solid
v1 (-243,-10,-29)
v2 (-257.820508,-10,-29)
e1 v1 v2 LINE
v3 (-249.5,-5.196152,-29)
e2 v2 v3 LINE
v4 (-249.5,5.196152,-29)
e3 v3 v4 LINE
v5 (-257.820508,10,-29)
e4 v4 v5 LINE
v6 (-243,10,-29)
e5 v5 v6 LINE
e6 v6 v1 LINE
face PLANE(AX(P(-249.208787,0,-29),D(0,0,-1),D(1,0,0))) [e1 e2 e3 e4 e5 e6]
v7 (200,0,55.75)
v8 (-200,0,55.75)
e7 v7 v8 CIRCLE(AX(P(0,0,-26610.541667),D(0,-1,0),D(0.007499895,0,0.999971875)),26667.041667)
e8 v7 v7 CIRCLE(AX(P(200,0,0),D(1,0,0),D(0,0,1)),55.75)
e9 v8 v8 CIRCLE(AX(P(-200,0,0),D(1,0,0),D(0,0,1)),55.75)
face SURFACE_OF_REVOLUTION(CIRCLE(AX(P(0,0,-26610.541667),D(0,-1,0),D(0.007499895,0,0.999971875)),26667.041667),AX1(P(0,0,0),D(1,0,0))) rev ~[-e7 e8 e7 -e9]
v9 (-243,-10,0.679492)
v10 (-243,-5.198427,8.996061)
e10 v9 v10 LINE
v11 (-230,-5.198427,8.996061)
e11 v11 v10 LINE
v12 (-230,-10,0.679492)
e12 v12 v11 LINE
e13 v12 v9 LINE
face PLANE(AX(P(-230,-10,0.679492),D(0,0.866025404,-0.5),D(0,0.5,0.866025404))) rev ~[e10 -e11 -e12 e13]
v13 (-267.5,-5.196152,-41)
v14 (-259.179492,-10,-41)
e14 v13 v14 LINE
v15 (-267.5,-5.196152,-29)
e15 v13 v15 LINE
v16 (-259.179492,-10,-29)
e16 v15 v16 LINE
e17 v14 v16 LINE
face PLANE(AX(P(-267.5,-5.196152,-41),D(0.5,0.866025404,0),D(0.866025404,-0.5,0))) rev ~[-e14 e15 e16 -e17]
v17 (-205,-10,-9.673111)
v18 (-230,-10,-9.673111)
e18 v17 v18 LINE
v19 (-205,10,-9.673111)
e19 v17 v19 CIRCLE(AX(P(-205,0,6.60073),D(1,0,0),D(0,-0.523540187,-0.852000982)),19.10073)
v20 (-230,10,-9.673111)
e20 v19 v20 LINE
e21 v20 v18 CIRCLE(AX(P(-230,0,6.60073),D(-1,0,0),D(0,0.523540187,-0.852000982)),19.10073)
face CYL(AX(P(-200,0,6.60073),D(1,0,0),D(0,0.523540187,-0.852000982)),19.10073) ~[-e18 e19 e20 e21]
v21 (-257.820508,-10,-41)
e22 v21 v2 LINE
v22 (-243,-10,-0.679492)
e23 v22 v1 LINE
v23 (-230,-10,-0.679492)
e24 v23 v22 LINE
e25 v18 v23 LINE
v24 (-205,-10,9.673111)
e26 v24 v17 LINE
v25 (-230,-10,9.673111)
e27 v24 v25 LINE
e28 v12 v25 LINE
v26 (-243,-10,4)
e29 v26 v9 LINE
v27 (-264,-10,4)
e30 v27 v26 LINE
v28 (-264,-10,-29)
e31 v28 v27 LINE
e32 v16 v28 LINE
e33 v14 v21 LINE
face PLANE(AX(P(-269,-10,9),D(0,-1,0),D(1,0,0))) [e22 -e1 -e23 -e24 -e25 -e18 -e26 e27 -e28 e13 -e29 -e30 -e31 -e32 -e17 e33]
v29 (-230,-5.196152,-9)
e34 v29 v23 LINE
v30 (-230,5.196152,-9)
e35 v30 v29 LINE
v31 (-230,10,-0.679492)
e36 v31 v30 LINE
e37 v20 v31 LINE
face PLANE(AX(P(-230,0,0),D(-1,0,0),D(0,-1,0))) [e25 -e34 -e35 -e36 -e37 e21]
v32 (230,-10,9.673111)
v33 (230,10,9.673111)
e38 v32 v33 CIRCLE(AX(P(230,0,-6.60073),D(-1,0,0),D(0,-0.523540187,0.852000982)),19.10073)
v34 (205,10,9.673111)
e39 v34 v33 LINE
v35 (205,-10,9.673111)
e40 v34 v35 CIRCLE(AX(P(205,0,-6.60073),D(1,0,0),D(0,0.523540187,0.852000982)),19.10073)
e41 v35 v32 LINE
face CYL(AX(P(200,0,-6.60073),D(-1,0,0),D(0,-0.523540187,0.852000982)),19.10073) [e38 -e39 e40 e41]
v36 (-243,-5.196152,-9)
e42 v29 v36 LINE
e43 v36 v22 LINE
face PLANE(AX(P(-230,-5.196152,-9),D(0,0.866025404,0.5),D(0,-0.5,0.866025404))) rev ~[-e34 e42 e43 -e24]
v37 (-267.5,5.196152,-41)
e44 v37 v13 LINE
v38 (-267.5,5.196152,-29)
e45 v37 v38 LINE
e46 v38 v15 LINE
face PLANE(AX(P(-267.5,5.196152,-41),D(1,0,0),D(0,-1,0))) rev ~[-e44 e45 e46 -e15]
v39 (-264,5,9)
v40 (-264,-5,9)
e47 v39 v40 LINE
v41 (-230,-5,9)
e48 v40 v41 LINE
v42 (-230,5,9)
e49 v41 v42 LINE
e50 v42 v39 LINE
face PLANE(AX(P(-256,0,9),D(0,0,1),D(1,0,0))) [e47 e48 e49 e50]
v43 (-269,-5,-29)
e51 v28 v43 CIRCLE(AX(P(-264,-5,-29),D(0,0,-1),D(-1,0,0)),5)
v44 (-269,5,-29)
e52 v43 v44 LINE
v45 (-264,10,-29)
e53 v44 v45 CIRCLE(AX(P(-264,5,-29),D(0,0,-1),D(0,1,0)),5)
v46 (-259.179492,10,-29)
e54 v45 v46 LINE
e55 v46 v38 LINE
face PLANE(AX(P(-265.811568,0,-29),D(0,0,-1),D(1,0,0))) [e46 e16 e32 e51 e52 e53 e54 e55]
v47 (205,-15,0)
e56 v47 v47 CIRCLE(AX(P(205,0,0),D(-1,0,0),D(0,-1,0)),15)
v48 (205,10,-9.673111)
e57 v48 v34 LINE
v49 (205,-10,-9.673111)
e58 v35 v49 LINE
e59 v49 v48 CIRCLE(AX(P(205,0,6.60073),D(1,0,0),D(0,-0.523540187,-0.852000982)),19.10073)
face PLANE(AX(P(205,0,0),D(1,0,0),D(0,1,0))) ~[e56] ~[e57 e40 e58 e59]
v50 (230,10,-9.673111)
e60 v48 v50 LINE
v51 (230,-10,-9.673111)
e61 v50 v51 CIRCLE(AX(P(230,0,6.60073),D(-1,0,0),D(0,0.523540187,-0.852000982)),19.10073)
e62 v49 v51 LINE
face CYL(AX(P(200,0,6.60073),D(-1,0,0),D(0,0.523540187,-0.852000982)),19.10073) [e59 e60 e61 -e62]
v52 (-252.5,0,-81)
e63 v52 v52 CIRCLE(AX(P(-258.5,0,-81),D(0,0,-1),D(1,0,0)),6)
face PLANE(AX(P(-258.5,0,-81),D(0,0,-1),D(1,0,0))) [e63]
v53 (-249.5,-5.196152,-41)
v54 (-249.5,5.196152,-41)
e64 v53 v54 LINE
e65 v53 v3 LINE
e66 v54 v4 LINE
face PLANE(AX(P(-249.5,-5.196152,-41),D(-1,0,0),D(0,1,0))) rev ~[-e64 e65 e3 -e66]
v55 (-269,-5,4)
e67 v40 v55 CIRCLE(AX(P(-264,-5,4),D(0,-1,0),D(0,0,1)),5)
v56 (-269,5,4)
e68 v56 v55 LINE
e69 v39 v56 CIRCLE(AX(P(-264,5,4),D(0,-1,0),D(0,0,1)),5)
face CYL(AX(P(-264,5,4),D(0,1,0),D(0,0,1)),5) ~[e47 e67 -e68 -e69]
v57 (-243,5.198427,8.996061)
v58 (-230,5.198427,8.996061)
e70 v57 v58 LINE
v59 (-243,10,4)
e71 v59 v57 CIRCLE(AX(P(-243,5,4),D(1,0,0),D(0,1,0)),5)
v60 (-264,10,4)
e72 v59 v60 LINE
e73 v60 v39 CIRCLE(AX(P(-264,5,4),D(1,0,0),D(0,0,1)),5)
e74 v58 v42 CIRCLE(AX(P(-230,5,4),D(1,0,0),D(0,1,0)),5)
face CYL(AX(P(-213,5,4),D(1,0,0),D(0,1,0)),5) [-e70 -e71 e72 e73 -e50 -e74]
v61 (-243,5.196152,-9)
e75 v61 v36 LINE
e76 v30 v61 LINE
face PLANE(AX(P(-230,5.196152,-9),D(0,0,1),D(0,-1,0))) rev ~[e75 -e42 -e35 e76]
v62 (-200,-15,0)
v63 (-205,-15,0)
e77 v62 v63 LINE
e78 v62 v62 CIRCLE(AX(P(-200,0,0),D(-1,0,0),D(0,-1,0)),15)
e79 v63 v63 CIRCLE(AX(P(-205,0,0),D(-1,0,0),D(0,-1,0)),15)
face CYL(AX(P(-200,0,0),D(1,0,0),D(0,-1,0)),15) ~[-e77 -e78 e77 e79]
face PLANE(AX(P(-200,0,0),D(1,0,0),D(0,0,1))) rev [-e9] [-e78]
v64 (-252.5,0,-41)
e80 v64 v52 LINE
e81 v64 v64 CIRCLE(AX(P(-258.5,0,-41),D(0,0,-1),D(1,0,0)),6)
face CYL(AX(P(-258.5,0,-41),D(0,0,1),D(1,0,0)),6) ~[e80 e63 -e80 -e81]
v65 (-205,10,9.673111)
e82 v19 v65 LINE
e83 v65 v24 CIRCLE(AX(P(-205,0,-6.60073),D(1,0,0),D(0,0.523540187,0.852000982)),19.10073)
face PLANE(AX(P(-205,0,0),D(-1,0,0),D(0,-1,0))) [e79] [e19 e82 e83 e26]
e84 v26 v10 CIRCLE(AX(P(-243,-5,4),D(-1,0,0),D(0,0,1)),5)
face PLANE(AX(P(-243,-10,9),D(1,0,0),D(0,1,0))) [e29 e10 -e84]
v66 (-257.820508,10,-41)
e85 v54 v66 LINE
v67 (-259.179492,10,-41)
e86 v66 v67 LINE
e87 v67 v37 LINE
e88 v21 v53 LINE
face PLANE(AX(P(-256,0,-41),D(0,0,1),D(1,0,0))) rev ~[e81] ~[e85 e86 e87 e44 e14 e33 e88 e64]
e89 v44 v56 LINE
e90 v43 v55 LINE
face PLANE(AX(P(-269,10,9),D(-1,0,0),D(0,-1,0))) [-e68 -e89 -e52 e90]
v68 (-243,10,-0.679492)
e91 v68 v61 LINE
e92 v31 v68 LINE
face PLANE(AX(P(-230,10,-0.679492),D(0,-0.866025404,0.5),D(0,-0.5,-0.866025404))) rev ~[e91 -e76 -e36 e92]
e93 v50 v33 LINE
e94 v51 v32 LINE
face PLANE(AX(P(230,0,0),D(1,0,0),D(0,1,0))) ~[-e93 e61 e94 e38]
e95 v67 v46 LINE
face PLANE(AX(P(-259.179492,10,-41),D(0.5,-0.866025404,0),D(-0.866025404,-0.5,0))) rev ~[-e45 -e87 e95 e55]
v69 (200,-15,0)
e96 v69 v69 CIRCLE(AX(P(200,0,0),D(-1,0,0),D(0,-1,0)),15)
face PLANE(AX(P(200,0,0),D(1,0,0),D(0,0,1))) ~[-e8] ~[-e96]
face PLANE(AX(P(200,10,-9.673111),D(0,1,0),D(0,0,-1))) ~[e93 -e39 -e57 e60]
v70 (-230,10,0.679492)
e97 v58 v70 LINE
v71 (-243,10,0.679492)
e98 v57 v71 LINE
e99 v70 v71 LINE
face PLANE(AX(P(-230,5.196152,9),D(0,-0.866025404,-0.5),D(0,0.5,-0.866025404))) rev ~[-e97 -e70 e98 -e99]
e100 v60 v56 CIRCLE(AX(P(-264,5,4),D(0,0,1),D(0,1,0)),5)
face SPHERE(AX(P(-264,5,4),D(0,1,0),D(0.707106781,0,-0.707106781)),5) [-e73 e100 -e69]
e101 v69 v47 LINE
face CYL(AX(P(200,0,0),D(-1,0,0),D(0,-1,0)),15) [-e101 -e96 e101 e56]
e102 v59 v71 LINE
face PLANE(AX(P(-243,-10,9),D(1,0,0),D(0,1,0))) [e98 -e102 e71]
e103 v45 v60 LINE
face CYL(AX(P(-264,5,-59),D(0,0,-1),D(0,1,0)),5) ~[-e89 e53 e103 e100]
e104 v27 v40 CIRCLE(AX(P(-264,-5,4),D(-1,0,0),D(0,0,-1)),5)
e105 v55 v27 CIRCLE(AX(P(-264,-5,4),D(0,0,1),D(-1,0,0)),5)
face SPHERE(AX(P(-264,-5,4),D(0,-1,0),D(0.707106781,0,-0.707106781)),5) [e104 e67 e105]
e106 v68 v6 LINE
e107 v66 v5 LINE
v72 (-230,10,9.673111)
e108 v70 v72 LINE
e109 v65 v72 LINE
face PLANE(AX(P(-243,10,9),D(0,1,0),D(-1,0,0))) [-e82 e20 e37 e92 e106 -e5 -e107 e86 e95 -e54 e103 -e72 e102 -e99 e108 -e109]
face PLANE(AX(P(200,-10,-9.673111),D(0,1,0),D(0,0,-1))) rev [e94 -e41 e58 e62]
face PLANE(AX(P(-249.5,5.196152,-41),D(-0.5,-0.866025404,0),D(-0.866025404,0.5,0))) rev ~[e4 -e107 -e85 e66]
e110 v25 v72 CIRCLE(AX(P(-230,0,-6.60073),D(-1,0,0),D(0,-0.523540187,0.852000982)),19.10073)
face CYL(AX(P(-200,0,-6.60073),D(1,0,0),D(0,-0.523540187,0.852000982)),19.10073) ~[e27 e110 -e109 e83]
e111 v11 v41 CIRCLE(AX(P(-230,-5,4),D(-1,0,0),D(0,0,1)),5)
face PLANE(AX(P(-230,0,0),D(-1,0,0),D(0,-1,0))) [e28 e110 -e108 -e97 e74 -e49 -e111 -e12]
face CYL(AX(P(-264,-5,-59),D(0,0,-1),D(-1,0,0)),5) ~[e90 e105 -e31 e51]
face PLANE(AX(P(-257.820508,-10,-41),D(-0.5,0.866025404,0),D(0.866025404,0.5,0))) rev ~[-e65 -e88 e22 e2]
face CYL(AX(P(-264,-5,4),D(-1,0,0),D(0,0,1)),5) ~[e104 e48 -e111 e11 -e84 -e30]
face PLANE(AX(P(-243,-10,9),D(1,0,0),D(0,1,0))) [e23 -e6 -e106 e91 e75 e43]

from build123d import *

# Parameters (mm, degrees)
F0_W          = 400
F0_H          = 55.75
F2_W          = 20
F2_H          = 19.3462212823
F3_DEPTH      = 30
F4_R          = 15
F5_DEPTH      = 5
F7_DEPTH      = 13
F9_DEPTH      = 50
F11_DEPTH     = 12
F12_R         = 6
F13_DEPTH     = 40
F14_T1_DEPTH  = 63
F14_T3_DEPTH  = 10
F14_S7_W      = 5.1
F14_S7_H      = 5.1
F14_T8_DEPTH  = 5.1
F14_S13_W     = 5.1
F14_S13_H     = 5.1
F14_T14_DEPTH = 5.1
F14_T20_DEPTH = 51
F14_T25_DEPTH = 51


# Not quite as in the source:
# - a fillet or chamfer that OpenCascade refuses, or shapes differently, is made with other operations: its cross-section is extruded or revolved along the edge and cut away or added
# - a pattern or mirror of a feature is missing from the dataset's text; its kind, count and spacing are read off the source's solid


with BuildPart() as f1:
    # F0 (on Front) → F1 (revolve)
    with BuildSketch(Plane.XZ):
        with Locations((0, 27.875)):
            Rectangle(F0_W, F0_H)
        with BuildLine():
            ThreePointArc((200, 55.75), (0, 56.5), (-200, 55.75))
            Line((-200, 55.75), (200, 55.75))
        make_face()
    revolve(axis=Axis((0, 0, 0), (1, 0, 0)))

    # F2 (on face) → F3 (join)
    with BuildSketch(Plane(origin=(-200, 0, 0), x_dir=(0, -1, 0), z_dir=(-1, 0, 0))):
        Rectangle(F2_W, F2_H)
        with BuildLine():
            ThreePointArc((-10, -9.6731106412), (0, -12.5), (10, -9.6731106412))
            Line((10, -9.6731106412), (-10, -9.6731106412))
        make_face()
        with BuildLine():
            Line((-10, 9.6731106412), (10, 9.6731106412))
            ThreePointArc((10, 9.6731106412), (0, 12.5), (-10, 9.6731106412))
        make_face()
    f3 = extrude(amount=F3_DEPTH)

    # F3_copies: F3 across plane
    add(f3.mirror(Plane(origin=(0, 0, 0), x_dir=(0, 0, 1), z_dir=(1, 0, 0))))

    # F4 (on face) → F5 (join)
    with BuildSketch(Plane(origin=(-200, 0, 0), x_dir=(0, -1, 0), z_dir=(-1, 0, 0))):
        Circle(F4_R)
        with BuildLine():
            Line((10, 9.6731106412), (10, -9.6731106412))
            ThreePointArc((10, -9.6731106412), (0, -12.5), (-10, -9.6731106412))
            Line((-10, -9.6731106412), (-10, 9.6731106412))
            ThreePointArc((-10, 9.6731106412), (0, 12.5), (10, 9.6731106412))
        make_face(mode=Mode.SUBTRACT)
    f5 = extrude(amount=F5_DEPTH)

    # F5_copies: F5 across plane
    add(f5.mirror(Plane(origin=(0, 0, 0), x_dir=(0, 0, 1), z_dir=(1, 0, 0))))

    # F6 (on face) → F7 (join)
    with BuildSketch(Plane(origin=(-230, 0, 0), x_dir=(0, -1, 0), z_dir=(-1, 0, 0))):
        Polygon((10, 0.6794919243), (5.1961524227, 9), (-5.1961524227, 9), (-10, 0.6794919243), (-10, -0.6794919243), (-5.1961524227, -9), (5.1961524227, -9), (10, -0.6794919243), align=None)
    extrude(amount=F7_DEPTH)

    # F8 (on face) → F9 (join)
    with BuildSketch(Plane.XY.offset(9)):
        Polygon((-243, 10), (-269, 10), (-269, -10), (-243, -10), (-243, -5.1961524227), (-243, 5.1961524227), align=None)
    extrude(amount=-F9_DEPTH)

    # F10 (on face) → F11 (cut)
    with BuildSketch(Plane(origin=(0, 0, -41), x_dir=(1, 0, 0), z_dir=(0, 0, -1))):
        Polygon((-269, -10), (-259.1794919243, -10), (-267.5, -5.1961524227), (-267.5, 5.1961524227), (-259.1794919243, 10), (-269, 10), align=None)
        Polygon((-257.8205080757, -10), (-243, -10), (-243, 10), (-257.8205080757, 10), (-249.5, 5.1961524227), (-249.5, -5.1961524227), align=None)
    extrude(amount=-F11_DEPTH, mode=Mode.SUBTRACT)

    # F12 (on face) → F13 (join)
    with BuildSketch(Plane(origin=(0, 0, -41), x_dir=(1, 0, 0), z_dir=(0, 0, -1))):
        with Locations((-258.5, 0)):
            Circle(F12_R)
    extrude(amount=F13_DEPTH)

    # F14: fillet of radius 5 on 5 edges, made by hand

    # F14_s2 → F14_t1 (cut)
    with BuildSketch(Plane.XY.offset(-59)):
        with BuildLine():
            ThreePointArc((-269, -5), (-267.5355339059, -8.5355339059), (-264, -10))
            Line((-264, -10), (-264, -10.1))
            Line((-264, -10.1), (-269.1, -10.1))
            Line((-269.1, -10.1), (-269.1, -5))
            Line((-269.1, -5), (-269, -5))
        make_face()
        with BuildLine():
            ThreePointArc((-264, 10), (-267.5355339059, 8.5355339059), (-269, 5))
            Line((-269, 5), (-269.1, 5))
            Line((-269.1, 5), (-269.1, 10.1))
            Line((-269.1, 10.1), (-264, 10.1))
            Line((-264, 10.1), (-264, 10))
        make_face()
    extrude(amount=F14_T1_DEPTH, mode=Mode.SUBTRACT)

    # F14_s4 → F14_t3 (cut)
    with BuildSketch(Plane.XZ.offset(-5)):
        with BuildLine():
            ThreePointArc((-264, 9), (-267.5355339059, 7.5355339059), (-269, 4))
            Line((-269, 4), (-269.1, 4))
            Line((-269.1, 4), (-269.1, 9.1))
            Line((-269.1, 9.1), (-264, 9.1))
            Line((-264, 9.1), (-264, 9))
        make_face()
    extrude(amount=F14_T3_DEPTH, mode=Mode.SUBTRACT)


with BuildPart() as f14_tool6:
    # F14_s7 → F14_t8 (new body)
    with BuildSketch(Plane.XZ.offset(5)):
        with Locations((-266.55, 6.55)):
            Rectangle(F14_S7_W, F14_S7_H)
    extrude(amount=F14_T8_DEPTH)

    # F14_s9 → F14_t10 (revolve, cut)
    with BuildSketch(Plane(origin=(-264, -5, 4), x_dir=(0.7071067812, 0, -0.7071067812), z_dir=(-0.7071067812, 0, -0.7071067812))):
        with BuildLine():
            ThreePointArc((0, -5), (5, 0), (0, 5))
            Line((0, 5), (0, -5))
        make_face()
    revolve(axis=Axis((-264, -5, 4), (0, -1, 0)), mode=Mode.SUBTRACT)


with BuildPart() as f1_1:
    add(f1.part)

    # F14_t5: cut F14_tool6
    add(f14_tool6.part, mode=Mode.SUBTRACT)


with BuildPart() as f14_tool12:
    # F14_s13 → F14_t14 (new body)
    with BuildSketch(Plane.XZ.offset(-5)):
        with Locations((-266.55, 6.55)):
            Rectangle(F14_S13_W, F14_S13_H)
    extrude(amount=-F14_T14_DEPTH)

    # F14_s15 → F14_t16 (revolve, cut)
    with BuildSketch(Plane(origin=(-264, 5, 4), x_dir=(0.7071067812, 0, -0.7071067812), z_dir=(0.7071067812, 0, 0.7071067812))):
        with BuildLine():
            ThreePointArc((0, -5), (5, 0), (0, 5))
            Line((0, 5), (0, -5))
        make_face()
    revolve(axis=Axis((-264, 5, 4), (0, 1, 0)), mode=Mode.SUBTRACT)


with BuildPart() as f1_2:
    add(f1_1.part)

    # F14_t11: cut F14_tool12
    add(f14_tool12.part, mode=Mode.SUBTRACT)


with BuildPart() as f14_tool18:
    # F14_s19 → F14_t20 (new body)
    with BuildSketch(Plane.YZ.offset(-264)):
        with BuildLine():
            ThreePointArc((-5, 9), (-8.5355339059, 7.5355339059), (-10, 4))
            Line((-10, 4), (-10.1, 4))
            Line((-10.1, 4), (-10.1, 9.1))
            Line((-10.1, 9.1), (-5, 9.1))
            Line((-5, 9.1), (-5, 9))
        make_face()
    extrude(amount=F14_T20_DEPTH)

    split(bisect_by=Plane.YZ.offset(-230), keep=Keep.BOTTOM)


with BuildPart() as f1_3:
    add(f1_2.part)

    # F14_t17: cut F14_tool18
    add(f14_tool18.part, mode=Mode.SUBTRACT)


with BuildPart() as f14_tool23:
    # F14_s24 → F14_t25 (new body)
    with BuildSketch(Plane.YZ.offset(-213)):
        with BuildLine():
            ThreePointArc((10, 4), (8.5355339059, 7.5355339059), (5, 9))
            Line((5, 9), (5, 9.1))
            Line((5, 9.1), (10.1, 9.1))
            Line((10.1, 9.1), (10.1, 4))
            Line((10.1, 4), (10, 4))
        make_face()
    extrude(amount=-F14_T25_DEPTH)

    split(bisect_by=Plane.YZ.offset(-230), keep=Keep.BOTTOM)


with BuildPart() as f1_4:
    add(f1_3.part)

    # F14_t22: cut F14_tool23
    add(f14_tool23.part, mode=Mode.SUBTRACT)


solid = f1_4.part
